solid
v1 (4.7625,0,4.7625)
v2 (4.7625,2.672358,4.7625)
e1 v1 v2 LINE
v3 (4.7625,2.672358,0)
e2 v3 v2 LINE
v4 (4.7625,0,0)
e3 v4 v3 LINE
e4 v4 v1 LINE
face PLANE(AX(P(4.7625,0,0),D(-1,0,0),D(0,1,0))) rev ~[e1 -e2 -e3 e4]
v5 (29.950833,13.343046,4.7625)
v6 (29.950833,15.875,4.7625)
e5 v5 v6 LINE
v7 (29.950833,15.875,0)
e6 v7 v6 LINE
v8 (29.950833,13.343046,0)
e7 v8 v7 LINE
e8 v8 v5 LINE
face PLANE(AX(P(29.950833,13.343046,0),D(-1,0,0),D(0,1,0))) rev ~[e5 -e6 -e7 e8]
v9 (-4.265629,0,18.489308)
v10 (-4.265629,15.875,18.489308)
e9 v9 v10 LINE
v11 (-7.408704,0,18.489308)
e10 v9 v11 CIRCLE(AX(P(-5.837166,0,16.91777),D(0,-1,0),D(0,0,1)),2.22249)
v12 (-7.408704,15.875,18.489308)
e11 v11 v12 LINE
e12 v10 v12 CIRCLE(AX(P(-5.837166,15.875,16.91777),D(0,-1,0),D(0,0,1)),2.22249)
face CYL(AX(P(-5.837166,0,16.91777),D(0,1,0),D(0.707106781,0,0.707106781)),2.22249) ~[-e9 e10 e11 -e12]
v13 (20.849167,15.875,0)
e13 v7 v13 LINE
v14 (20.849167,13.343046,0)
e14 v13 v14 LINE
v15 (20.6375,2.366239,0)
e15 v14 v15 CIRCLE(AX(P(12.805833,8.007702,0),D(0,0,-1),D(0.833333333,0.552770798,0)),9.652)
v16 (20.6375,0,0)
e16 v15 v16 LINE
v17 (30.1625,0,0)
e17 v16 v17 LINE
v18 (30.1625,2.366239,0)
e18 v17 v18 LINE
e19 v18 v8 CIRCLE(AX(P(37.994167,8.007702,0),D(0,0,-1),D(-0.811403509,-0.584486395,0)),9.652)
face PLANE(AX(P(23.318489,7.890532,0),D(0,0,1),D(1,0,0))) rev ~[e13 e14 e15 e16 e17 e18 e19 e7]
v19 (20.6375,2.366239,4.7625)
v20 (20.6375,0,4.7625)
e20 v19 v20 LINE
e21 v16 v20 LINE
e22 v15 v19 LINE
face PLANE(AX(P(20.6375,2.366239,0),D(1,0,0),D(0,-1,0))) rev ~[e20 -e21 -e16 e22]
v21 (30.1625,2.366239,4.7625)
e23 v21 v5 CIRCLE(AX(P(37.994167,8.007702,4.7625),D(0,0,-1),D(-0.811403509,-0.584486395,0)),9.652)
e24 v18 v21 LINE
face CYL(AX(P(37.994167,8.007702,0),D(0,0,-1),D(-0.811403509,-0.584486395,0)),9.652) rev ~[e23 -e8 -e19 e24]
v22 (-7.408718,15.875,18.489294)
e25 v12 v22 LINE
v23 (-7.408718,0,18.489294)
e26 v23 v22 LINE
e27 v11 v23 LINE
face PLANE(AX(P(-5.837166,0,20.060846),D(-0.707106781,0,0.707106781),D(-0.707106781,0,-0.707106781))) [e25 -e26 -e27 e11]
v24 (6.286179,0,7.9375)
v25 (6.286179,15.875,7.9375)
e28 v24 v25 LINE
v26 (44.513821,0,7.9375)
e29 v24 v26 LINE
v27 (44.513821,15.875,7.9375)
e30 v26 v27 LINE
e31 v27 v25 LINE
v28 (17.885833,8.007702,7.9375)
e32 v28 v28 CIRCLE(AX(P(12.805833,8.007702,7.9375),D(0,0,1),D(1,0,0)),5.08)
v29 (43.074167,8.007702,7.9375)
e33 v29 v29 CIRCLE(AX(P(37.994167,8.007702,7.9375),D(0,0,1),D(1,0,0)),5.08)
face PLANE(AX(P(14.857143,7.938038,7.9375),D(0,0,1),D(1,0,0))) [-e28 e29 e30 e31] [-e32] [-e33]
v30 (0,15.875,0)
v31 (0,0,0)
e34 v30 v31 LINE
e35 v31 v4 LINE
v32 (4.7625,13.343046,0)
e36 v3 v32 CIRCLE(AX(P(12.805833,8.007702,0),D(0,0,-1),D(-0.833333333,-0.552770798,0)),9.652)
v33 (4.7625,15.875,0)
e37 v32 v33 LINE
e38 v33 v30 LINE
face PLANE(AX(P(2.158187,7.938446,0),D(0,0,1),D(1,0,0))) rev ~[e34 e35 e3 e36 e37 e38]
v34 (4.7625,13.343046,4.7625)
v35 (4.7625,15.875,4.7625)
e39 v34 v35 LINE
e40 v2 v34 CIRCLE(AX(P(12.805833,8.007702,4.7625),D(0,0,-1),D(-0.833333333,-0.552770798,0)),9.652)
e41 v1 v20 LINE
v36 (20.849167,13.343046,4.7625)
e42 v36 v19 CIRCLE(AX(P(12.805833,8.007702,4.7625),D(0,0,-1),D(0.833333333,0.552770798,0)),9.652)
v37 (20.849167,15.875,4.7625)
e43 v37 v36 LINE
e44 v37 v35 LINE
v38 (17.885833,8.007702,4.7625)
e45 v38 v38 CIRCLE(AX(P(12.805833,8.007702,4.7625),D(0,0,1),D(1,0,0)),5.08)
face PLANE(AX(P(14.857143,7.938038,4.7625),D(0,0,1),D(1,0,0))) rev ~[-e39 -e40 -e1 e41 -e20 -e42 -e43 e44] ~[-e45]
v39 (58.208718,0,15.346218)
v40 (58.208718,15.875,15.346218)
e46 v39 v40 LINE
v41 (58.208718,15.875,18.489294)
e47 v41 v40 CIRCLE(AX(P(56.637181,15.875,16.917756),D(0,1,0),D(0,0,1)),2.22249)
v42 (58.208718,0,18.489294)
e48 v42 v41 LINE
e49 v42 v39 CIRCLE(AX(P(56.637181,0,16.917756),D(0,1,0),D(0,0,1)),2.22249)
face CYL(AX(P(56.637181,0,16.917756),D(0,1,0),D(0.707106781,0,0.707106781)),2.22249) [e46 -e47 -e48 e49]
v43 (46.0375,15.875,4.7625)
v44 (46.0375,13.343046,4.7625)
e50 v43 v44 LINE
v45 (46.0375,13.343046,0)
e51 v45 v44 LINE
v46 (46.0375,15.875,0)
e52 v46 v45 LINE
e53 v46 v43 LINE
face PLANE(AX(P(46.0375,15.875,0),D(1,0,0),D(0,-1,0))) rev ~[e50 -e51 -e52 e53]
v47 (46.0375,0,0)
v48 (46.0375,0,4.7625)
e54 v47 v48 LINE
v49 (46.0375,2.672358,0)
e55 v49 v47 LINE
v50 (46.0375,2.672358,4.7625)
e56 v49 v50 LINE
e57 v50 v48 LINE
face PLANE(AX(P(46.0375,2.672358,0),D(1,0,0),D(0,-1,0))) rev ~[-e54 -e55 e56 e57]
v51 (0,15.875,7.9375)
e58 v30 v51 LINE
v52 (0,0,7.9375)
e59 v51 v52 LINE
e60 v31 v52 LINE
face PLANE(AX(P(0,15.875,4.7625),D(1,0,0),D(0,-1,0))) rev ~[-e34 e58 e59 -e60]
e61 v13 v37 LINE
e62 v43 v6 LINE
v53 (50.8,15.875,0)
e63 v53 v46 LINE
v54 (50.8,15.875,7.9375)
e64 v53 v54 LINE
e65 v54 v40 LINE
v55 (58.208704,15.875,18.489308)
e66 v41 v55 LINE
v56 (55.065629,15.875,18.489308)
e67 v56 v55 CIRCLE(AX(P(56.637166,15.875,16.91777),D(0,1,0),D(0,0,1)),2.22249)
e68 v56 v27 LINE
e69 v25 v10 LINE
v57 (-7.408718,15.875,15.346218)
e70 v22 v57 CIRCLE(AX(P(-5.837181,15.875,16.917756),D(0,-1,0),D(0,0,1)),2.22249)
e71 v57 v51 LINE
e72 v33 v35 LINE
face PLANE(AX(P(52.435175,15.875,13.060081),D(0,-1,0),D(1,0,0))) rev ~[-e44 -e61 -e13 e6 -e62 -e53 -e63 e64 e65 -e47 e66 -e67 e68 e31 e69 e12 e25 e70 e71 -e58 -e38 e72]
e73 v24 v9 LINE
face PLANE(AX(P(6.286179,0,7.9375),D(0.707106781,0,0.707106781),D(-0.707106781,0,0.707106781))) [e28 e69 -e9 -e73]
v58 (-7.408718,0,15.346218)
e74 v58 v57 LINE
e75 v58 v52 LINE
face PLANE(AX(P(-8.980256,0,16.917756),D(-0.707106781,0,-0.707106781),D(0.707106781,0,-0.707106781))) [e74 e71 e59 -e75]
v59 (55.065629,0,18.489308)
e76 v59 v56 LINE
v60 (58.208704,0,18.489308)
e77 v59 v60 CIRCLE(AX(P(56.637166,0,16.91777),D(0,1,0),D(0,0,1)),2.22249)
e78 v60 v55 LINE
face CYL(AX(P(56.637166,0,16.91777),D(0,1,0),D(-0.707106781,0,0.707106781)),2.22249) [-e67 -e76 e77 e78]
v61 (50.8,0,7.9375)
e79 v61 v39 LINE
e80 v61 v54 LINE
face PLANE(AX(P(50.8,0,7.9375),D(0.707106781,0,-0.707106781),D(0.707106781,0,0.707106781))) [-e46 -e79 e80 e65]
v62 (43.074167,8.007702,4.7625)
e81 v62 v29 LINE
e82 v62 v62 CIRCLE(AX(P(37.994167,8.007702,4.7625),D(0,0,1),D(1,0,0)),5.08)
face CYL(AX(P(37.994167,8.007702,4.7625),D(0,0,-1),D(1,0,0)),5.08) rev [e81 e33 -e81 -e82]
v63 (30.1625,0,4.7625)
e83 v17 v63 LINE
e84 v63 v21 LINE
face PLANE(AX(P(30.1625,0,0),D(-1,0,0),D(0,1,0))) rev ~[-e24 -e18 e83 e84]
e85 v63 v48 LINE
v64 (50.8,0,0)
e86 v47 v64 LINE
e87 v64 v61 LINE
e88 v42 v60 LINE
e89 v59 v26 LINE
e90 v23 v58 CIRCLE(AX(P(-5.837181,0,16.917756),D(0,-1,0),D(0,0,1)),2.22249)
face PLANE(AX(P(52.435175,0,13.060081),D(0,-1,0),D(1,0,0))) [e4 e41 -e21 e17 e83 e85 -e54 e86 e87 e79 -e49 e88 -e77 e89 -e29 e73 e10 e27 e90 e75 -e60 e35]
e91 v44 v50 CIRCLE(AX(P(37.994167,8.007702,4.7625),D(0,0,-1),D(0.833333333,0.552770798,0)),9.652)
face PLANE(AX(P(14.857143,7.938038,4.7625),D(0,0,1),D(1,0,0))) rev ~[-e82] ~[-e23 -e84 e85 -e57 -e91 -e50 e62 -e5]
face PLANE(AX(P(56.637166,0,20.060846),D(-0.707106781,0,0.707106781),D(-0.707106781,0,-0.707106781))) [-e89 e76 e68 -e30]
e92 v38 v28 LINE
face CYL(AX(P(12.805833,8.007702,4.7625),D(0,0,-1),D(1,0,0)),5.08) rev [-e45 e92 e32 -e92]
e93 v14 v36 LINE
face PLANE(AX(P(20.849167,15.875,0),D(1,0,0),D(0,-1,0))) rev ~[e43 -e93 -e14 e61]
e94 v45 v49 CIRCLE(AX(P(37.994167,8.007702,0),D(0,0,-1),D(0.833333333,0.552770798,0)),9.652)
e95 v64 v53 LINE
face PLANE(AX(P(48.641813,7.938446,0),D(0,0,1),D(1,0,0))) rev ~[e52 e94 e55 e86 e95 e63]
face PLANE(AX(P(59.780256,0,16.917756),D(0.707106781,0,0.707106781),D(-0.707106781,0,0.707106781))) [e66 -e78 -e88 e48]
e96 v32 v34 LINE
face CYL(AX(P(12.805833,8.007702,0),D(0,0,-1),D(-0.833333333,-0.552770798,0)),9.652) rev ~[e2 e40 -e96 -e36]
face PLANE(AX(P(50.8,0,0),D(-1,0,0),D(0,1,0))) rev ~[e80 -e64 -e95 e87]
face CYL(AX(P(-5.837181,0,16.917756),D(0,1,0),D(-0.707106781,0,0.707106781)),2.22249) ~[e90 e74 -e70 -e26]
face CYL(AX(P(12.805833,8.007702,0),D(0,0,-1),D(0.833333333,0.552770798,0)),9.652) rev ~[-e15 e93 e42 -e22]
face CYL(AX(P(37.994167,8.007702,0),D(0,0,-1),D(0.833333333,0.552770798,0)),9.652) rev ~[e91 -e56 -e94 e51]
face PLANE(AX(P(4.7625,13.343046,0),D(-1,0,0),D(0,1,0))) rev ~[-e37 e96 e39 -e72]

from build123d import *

# Parameters (mm, degrees)
F1_DEPTH = 4.7625
F2_R     = 5.08
F3_DEPTH = 3.175
F6_DEPTH = 15.875
F7_R     = 2.22249


# Not quite as in the source:
# - a fillet or chamfer is up to 0.001 mm smaller than in the source, because OpenCascade refuses the exact size


with BuildPart() as f1:
    # F0 (on Top) → F1 (new body)
    with BuildSketch(Plane.XY):
        with BuildLine():
            Line((0, 15.875), (0, 0))
            Line((0, 0), (4.7625, 0))
            Line((4.7625, 0), (4.7625, 2.6723581453))
            ThreePointArc((4.7625, 2.6723581453), (3.1538333333, 8.0077018914), (4.7625, 13.3430456375))
            Line((4.7625, 13.3430456375), (4.7625, 15.875))
            Line((4.7625, 15.875), (3.175, 15.875))
            Line((3.175, 15.875), (0, 15.875))
        make_face()
    extrude(amount=F1_DEPTH)


with BuildPart() as f1b:
    # F0 (on Top) → F1, piece 2 (new body)
    with BuildSketch(Plane.XY):
        with BuildLine():
            Line((20.6375, 2.3662392068), (20.6375, 0))
            Line((20.6375, 0), (25.4, 0))
            Line((25.4, 0), (25.4, 15.875))
            Line((25.4, 15.875), (20.8491666667, 15.875))
            Line((20.8491666667, 15.875), (20.8491666667, 13.3430456375))
            ThreePointArc((20.8491666667, 13.3430456375), (22.4560393469, 7.8216161703), (20.6375, 2.3662392068))
        make_face()
        with BuildLine():
            Line((25.4, 15.875), (25.4, 0))
            Line((25.4, 0), (30.1625, 0))
            Line((30.1625, 0), (30.1625, 2.3662392068))
            ThreePointArc((30.1625, 2.3662392068), (28.3439606531, 7.8216161703), (29.9508333333, 13.3430456375))
            Line((29.9508333333, 13.3430456375), (29.9508333333, 15.875))
            Line((29.9508333333, 15.875), (25.4, 15.875))
        make_face()
    extrude(amount=F1_DEPTH)


with BuildPart() as f1c:
    # F0 (on Top) → F1, piece 3 (new body)
    with BuildSketch(Plane.XY):
        with BuildLine():
            Line((46.0375, 2.6723581453), (46.0375, 0))
            Line((46.0375, 0), (50.8, 0))
            Line((50.8, 0), (50.8, 15.875))
            Line((50.8, 15.875), (46.0375, 15.875))
            Line((46.0375, 15.875), (46.0375, 13.3430456375))
            ThreePointArc((46.0375, 13.3430456375), (47.6461666667, 8.0077018914), (46.0375, 2.6723581453))
        make_face()
    extrude(amount=F1_DEPTH)


with BuildPart() as f3:
    # F2 (on face) → F3 (new body)
    with BuildSketch(Plane.XY.offset(4.7625)):
        with BuildLine():
            Line((25.4, 15.875), (4.7625, 15.875))
            Line((4.7625, 15.875), (4.7625, 13.3430456375))
            ThreePointArc((4.7625, 13.3430456375), (3.1538333333, 8.0077018914), (4.7625, 2.6723581453))
            Line((4.7625, 2.6723581453), (4.7625, 0))
            Line((4.7625, 0), (20.6375, 0))
            Line((20.6375, 0), (25.4, 0))
            Line((25.4, 0), (25.4, 2.2267585155))
            Line((25.4, 2.2267585155), (25.4, 15.875))
        make_face()
        with Locations((12.8058333333, 8.0077018914)):
            Circle(F2_R, mode=Mode.SUBTRACT)
        Polygon((46.0375, 15.875), (25.4, 15.875), (25.4, 2.2267585155), (25.4, 0), (30.1625, 0), (50.8, 0), (50.8, 15.875), align=None)
        with Locations((37.9941666667, 8.0077018914)):
            Circle(F2_R, mode=Mode.SUBTRACT)
        with BuildLine():
            Line((4.7625, 15.875), (0, 15.875))
            Line((0, 15.875), (0, 0))
            Line((0, 0), (4.7625, 0))
            Line((4.7625, 0), (4.7625, 2.6723581453))
            ThreePointArc((4.7625, 2.6723581453), (3.1538333333, 8.0077018914), (4.7625, 13.3430456375))
            Line((4.7625, 13.3430456375), (4.7625, 15.875))
        make_face()
    extrude(amount=F3_DEPTH)


with BuildPart() as f1_1:
    add(f1.part)

    # F4: union F3, F1b, F1c
    add(f3.part)
    add(f1b.part)
    add(f1c.part)

    # F5 (on face) → F6 (join)
    with BuildSketch(Plane.XZ):
        Polygon((56.6371664787, 20.0608457634), (44.5138207153, 7.9375), (50.8, 7.9375), (59.7802561211, 16.9177561211), align=None)
        Polygon((-8.9802561211, 16.9177561211), (0, 7.9375), (6.2861792847, 7.9375), (-5.8371664787, 20.0608457634), align=None)
    extrude(amount=-F6_DEPTH)

    # F7 (radius 2.2225 in the source; OpenCascade refuses exactly that, so slightly less here)
    f7_edges = [f1_1.edges().sort_by_distance(p)[0] for p in [
        (-8.980256, 7.9375, 16.917756),
        (-5.837166, 7.9375, 20.060846),
        (56.637166, 7.9375, 20.060846),
        (59.780256, 7.9375, 16.917756),
    ]]
    fillet(f7_edges, radius=F7_R)


solid = f1_1.part
